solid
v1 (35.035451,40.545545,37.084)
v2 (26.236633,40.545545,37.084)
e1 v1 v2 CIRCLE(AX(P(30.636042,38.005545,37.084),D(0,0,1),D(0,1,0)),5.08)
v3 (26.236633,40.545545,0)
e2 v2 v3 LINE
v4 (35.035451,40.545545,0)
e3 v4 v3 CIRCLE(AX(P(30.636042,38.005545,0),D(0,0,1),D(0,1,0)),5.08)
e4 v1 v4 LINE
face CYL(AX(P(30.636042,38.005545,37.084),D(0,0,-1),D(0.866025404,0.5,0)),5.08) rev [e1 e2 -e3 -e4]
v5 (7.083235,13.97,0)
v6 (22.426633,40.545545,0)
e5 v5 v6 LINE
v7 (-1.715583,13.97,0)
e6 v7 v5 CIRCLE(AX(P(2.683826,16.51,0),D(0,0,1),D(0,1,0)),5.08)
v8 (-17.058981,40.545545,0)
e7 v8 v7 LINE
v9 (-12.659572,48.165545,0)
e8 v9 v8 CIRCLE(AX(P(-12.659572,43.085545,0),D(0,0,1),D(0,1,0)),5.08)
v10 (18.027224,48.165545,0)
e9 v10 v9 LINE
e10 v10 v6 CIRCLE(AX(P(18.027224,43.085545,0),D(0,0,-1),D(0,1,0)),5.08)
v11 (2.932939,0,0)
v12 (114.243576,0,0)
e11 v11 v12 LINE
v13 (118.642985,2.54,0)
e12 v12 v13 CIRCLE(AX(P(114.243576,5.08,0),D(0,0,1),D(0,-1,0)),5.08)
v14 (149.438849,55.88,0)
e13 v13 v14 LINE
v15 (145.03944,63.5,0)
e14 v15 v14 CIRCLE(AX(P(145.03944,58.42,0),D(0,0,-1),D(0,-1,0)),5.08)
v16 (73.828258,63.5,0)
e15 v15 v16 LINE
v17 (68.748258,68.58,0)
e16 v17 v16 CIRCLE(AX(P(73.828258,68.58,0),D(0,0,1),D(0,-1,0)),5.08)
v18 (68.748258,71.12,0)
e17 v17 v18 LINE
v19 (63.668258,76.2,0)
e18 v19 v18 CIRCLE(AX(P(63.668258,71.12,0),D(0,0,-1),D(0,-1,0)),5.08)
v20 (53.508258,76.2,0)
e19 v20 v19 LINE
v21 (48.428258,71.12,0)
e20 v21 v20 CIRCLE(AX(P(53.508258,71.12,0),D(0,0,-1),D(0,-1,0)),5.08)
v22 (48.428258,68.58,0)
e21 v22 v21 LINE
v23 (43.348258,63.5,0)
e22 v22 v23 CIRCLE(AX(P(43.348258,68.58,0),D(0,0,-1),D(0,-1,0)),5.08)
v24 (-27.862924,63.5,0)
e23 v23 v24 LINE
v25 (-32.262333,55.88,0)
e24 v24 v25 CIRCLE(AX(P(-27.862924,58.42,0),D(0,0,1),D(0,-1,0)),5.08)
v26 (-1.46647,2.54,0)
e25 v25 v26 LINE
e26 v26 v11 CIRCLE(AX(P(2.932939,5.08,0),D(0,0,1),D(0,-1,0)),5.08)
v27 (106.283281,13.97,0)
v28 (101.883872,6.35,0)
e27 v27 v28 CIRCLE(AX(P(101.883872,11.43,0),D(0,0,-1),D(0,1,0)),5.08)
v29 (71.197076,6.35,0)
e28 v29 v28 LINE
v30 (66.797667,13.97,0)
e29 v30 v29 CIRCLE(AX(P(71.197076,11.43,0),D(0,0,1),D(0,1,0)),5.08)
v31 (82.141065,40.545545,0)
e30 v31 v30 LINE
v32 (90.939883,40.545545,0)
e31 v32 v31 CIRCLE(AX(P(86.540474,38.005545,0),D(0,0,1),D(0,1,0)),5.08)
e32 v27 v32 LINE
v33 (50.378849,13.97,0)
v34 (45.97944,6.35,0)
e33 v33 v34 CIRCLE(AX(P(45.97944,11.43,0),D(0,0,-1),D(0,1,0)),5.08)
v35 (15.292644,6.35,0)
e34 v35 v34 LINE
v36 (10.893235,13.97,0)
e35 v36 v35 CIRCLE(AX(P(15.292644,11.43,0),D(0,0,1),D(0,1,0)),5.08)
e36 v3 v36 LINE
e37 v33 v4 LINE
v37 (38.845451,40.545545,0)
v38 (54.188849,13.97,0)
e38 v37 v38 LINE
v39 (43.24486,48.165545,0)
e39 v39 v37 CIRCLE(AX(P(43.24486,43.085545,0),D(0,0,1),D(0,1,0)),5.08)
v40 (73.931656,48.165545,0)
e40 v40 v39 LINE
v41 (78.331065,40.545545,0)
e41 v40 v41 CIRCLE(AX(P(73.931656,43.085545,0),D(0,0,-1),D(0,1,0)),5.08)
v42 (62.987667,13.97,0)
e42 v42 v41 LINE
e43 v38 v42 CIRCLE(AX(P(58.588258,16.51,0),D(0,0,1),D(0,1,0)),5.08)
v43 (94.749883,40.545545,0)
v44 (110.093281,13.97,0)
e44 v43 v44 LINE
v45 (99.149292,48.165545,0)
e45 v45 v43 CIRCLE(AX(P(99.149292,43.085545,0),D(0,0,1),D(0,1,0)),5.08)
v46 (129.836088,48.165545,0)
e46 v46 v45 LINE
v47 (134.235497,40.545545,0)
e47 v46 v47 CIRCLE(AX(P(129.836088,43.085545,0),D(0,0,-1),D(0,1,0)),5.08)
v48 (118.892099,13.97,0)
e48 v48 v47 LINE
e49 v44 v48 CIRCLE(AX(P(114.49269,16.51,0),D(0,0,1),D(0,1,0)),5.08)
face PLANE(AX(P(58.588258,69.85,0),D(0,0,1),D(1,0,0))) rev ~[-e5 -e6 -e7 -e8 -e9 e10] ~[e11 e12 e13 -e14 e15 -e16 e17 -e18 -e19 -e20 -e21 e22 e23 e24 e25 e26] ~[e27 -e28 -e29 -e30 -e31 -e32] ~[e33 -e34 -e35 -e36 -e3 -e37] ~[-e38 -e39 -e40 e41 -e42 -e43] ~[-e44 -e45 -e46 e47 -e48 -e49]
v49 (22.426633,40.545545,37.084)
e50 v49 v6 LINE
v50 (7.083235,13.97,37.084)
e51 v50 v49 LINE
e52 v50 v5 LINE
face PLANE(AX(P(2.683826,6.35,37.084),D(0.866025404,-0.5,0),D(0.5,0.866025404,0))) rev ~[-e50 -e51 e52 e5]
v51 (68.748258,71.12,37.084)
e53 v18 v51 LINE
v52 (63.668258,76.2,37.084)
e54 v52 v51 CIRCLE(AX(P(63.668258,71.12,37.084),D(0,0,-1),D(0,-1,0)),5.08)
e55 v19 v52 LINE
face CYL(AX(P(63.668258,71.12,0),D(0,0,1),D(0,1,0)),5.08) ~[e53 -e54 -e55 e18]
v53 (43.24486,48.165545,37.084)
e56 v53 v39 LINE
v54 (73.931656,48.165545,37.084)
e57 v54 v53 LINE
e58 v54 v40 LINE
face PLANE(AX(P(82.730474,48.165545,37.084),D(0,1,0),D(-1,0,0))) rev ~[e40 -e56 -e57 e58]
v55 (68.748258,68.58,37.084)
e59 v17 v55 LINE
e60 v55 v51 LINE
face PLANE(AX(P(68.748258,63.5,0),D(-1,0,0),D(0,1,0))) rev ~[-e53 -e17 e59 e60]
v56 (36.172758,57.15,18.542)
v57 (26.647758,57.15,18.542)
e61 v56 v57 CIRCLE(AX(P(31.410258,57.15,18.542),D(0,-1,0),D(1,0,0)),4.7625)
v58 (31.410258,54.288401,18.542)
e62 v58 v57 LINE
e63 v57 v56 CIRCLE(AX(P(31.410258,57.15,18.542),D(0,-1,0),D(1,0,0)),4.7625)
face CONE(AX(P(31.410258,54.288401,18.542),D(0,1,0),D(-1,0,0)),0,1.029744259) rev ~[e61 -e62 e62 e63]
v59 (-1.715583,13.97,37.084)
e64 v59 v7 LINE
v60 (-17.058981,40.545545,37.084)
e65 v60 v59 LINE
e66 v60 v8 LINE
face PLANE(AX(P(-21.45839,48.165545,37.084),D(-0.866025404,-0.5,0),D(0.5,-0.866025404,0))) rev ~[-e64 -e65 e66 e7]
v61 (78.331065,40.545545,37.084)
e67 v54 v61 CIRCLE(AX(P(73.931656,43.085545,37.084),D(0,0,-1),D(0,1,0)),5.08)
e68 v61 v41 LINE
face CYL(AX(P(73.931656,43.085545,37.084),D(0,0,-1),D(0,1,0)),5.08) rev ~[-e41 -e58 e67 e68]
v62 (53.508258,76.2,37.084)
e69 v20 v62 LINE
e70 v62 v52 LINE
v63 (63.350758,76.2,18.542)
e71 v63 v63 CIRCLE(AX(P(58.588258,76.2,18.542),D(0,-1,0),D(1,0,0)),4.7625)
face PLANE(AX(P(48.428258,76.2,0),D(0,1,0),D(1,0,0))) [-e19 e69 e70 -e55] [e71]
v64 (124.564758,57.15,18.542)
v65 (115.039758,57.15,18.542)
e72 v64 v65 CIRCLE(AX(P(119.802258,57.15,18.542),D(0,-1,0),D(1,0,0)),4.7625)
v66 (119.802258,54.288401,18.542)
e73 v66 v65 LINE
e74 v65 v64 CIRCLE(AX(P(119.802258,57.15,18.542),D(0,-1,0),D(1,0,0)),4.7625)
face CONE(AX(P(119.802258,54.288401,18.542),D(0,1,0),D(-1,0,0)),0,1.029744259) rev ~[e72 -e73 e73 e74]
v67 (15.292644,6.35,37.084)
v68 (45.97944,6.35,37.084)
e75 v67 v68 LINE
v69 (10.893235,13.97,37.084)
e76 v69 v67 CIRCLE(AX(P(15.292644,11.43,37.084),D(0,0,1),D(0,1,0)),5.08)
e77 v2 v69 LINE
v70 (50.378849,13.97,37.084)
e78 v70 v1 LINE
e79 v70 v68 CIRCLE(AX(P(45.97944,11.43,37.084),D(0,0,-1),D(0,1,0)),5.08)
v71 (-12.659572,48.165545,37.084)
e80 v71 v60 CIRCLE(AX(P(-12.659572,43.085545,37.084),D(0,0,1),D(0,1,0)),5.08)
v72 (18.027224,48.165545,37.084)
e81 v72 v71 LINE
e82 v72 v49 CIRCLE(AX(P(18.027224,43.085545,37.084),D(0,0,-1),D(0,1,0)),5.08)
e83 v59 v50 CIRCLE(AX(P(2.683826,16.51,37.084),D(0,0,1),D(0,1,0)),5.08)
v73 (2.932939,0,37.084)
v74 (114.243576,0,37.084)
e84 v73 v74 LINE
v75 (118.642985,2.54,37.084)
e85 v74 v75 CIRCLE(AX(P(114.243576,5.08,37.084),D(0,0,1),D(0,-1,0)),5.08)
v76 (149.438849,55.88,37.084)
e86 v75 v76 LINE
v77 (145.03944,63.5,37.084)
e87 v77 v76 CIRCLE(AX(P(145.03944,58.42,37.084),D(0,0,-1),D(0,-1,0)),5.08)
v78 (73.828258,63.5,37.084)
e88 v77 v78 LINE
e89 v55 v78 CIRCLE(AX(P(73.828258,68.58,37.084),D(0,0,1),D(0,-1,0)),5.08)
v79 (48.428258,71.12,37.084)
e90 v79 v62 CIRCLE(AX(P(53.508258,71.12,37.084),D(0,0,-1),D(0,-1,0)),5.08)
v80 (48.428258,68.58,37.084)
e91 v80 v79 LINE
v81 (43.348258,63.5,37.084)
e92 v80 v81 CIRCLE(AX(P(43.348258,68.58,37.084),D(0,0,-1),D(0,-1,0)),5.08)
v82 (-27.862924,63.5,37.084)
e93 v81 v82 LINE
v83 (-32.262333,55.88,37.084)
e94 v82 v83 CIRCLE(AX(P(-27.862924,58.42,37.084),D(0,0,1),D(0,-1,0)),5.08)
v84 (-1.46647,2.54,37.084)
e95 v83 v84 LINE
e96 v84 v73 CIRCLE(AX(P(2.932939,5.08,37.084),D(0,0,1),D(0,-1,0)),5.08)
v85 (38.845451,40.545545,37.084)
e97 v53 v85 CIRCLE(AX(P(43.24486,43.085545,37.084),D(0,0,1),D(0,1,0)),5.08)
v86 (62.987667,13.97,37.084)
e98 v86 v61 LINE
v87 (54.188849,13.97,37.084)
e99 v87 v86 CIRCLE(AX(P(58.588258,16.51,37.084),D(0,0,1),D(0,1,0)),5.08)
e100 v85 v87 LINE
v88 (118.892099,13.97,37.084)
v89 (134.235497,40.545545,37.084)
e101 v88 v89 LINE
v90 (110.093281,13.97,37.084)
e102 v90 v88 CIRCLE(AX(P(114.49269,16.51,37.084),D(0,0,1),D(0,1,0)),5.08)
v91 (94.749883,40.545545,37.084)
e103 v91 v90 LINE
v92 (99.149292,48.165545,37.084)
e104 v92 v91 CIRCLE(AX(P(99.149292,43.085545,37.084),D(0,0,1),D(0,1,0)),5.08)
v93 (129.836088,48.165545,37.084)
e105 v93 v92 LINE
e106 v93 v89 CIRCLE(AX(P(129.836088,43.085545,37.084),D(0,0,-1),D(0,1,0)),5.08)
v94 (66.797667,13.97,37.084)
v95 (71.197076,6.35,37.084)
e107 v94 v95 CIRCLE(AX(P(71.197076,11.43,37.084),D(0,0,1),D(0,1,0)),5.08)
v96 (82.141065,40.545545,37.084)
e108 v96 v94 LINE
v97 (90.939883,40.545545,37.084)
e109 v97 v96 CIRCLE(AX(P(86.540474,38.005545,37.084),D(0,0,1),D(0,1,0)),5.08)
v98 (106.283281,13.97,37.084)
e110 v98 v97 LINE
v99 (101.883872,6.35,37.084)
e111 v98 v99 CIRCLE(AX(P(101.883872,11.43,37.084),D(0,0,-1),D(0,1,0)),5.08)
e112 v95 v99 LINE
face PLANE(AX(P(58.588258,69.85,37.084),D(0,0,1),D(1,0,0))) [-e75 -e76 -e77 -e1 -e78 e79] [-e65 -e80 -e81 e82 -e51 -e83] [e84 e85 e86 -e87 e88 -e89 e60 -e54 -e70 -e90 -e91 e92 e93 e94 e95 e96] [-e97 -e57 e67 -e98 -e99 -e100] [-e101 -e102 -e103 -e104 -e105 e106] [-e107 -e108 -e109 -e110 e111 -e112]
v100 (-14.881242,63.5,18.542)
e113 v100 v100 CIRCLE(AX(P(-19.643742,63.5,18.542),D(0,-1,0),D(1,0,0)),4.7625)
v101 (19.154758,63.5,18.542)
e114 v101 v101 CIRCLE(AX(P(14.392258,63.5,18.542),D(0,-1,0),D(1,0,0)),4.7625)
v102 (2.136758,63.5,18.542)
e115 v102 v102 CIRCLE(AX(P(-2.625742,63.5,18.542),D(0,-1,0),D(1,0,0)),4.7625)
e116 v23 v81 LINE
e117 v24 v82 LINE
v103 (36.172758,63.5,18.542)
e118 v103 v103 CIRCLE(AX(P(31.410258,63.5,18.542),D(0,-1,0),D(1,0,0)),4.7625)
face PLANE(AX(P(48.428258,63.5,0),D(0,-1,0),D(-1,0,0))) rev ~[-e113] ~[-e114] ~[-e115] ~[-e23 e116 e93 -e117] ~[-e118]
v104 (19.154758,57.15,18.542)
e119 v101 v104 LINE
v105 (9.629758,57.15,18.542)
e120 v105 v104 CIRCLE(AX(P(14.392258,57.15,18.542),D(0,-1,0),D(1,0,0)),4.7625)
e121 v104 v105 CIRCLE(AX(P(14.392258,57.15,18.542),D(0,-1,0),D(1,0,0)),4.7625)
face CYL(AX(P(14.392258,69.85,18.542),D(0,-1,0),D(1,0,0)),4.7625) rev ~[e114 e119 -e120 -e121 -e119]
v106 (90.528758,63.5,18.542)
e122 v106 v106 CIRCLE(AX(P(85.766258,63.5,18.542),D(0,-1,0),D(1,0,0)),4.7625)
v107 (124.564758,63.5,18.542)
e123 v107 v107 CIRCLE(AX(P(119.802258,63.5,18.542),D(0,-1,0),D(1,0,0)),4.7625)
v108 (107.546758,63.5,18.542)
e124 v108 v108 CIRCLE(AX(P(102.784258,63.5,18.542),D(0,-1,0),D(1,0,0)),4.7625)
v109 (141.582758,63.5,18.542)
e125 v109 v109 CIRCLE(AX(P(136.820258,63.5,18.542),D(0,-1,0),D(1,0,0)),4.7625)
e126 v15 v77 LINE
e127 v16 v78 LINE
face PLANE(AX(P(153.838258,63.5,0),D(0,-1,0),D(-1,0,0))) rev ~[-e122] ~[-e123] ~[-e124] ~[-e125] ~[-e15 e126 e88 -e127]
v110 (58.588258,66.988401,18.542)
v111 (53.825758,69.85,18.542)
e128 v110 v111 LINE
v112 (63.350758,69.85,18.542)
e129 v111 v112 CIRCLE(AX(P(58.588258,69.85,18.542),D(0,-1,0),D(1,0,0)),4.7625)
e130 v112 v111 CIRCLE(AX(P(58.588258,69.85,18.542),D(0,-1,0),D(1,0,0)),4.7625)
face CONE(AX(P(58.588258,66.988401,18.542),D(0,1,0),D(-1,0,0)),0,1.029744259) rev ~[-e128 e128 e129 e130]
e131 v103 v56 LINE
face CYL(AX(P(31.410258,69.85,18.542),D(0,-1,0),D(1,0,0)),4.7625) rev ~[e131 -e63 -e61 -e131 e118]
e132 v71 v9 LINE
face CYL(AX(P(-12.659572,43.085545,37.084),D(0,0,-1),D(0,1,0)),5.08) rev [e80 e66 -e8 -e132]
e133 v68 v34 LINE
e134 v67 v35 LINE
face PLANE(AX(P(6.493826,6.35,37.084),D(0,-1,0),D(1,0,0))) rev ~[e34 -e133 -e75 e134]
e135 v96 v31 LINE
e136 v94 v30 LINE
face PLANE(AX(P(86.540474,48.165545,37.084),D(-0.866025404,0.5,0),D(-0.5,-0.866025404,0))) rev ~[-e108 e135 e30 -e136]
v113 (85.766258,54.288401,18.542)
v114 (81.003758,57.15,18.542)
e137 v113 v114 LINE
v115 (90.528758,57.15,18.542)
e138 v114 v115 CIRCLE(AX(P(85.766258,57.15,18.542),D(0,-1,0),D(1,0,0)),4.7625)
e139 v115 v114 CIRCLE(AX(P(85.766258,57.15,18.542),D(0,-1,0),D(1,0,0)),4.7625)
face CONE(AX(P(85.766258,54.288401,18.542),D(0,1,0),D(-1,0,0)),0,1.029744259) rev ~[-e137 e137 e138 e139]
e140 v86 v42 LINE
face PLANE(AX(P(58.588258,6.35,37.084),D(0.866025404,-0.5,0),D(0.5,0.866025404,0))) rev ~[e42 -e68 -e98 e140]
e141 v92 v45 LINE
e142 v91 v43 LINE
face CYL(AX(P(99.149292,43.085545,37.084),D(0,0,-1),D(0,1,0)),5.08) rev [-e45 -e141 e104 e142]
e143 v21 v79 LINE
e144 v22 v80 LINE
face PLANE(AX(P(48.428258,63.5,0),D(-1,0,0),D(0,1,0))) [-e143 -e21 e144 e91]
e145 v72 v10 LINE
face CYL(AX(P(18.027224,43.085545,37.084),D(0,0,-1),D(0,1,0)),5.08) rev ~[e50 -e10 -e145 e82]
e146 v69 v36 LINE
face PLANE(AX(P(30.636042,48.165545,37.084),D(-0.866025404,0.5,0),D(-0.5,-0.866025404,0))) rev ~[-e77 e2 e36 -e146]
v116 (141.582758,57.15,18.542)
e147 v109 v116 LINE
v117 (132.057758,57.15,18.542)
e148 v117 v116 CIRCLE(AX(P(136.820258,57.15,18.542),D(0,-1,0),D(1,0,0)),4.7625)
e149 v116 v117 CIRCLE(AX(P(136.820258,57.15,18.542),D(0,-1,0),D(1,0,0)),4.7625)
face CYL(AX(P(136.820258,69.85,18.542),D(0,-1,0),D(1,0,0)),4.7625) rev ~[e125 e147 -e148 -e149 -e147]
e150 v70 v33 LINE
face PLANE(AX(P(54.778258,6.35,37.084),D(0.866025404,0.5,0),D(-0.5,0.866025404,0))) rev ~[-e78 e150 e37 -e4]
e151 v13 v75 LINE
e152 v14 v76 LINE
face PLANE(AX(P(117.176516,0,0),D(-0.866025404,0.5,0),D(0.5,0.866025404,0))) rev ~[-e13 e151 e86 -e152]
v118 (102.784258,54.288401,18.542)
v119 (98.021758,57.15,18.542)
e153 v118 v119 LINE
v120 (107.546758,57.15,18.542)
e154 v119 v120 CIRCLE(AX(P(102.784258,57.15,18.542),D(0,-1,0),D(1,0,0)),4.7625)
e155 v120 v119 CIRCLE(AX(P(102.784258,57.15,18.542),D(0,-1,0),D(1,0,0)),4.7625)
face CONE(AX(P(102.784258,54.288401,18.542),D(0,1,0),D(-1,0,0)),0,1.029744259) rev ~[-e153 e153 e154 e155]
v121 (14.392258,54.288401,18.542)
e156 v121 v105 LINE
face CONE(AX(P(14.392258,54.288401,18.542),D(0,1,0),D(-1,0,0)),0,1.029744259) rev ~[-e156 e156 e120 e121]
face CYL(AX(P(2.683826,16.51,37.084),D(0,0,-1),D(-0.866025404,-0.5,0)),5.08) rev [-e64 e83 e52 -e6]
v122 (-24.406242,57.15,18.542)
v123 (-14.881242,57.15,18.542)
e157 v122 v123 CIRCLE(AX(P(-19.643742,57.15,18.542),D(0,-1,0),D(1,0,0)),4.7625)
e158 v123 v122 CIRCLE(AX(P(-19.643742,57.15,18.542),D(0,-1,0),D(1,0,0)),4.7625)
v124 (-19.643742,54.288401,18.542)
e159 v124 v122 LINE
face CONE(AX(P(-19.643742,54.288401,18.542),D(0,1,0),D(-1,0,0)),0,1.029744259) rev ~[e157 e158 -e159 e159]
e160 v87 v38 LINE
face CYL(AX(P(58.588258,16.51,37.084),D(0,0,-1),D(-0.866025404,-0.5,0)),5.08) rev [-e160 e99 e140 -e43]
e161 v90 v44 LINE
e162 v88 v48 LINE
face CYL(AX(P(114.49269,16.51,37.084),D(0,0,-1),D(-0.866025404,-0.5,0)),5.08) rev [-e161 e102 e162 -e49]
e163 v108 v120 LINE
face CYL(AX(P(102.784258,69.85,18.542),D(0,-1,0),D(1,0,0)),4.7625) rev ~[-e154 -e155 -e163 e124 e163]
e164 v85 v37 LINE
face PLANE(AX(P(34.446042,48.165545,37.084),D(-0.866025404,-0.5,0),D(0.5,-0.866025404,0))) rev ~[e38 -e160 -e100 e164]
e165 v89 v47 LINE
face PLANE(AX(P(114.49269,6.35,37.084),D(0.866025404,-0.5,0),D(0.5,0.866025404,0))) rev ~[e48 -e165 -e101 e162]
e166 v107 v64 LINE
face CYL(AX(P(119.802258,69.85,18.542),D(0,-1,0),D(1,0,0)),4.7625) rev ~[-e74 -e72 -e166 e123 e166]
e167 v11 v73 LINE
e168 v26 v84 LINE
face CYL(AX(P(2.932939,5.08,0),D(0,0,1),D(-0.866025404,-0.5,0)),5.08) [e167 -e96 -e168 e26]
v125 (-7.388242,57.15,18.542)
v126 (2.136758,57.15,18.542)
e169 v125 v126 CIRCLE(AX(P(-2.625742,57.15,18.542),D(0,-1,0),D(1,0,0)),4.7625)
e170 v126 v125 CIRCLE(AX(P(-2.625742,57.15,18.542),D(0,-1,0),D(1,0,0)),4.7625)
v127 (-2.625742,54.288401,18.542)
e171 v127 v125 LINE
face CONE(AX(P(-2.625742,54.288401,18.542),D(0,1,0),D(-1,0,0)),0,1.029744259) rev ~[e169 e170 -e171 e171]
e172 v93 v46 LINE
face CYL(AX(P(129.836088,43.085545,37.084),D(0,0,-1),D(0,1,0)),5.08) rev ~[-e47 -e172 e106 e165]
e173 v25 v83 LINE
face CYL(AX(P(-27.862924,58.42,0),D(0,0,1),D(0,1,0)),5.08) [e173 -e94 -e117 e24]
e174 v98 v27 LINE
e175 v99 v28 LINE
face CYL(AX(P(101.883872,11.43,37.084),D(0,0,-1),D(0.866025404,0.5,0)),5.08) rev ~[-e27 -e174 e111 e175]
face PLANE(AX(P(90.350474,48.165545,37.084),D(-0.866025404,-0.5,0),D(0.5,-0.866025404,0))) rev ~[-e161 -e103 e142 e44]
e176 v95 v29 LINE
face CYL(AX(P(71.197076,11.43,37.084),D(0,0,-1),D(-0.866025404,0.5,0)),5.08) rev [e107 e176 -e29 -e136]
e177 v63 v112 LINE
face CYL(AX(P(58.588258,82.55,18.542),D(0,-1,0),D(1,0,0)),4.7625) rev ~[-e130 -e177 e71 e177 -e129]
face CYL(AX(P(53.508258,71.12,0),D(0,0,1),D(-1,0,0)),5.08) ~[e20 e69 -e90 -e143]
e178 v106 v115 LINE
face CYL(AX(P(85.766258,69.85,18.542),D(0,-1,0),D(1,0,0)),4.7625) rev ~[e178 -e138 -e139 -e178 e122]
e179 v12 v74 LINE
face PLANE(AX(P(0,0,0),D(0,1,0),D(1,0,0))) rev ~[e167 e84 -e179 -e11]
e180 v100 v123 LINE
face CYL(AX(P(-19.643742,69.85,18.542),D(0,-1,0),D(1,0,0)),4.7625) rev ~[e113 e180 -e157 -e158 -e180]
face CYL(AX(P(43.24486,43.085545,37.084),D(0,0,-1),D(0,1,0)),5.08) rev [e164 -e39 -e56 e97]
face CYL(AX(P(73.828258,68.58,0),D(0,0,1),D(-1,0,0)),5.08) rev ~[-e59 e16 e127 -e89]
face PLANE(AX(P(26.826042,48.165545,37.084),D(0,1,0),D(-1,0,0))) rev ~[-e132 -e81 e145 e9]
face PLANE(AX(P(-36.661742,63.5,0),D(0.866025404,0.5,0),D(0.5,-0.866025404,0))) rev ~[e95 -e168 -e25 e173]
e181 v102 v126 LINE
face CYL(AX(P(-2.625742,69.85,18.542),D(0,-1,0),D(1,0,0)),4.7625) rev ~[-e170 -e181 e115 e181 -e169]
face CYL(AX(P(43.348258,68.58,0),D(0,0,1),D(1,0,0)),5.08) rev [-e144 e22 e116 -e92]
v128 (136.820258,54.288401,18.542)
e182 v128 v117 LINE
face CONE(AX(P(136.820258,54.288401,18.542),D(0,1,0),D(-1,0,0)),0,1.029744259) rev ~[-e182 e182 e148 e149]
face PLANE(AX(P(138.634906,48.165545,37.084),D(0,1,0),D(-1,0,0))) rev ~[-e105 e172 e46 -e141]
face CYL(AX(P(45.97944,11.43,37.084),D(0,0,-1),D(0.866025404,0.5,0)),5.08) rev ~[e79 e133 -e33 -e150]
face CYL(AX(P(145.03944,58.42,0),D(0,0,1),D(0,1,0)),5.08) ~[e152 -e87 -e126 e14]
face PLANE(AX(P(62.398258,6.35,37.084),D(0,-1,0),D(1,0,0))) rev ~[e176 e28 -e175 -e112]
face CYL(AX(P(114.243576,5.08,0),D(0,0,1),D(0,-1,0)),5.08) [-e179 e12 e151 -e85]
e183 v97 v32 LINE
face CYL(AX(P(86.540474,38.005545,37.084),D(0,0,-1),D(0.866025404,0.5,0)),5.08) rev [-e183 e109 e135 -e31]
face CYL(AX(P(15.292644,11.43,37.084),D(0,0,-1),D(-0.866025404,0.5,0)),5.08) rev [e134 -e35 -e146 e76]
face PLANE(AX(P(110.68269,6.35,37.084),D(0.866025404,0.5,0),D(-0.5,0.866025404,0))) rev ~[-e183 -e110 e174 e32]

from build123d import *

# Parameters (mm, degrees)
F0_W           = 20.32
F0_H           = 12.7
F1_DEPTH       = 37.084
F5_D           = 9.525
F5_DEPTH       = 6.35
F5_TIP         = 2.8615986981
F5_ON_F3_D     = 9.525
F5_ON_F3_DEPTH = 6.35
F5_ON_F3_TIP   = 2.8615986981
F5_ON_F4_D     = 9.525
F5_ON_F4_DEPTH = 6.35
F5_ON_F4_TIP   = 2.8615986981
F7_DEPTH       = 37.085
F8_R           = 5.08


# Not quite as in the source:
# - a length typed as a fraction of an inch, garbled in the dataset ("3 / 203.2 mm" for 3/8 in), is restored


with BuildPart() as f1:
    # F0 (on Top) → F1 (new body)
    with BuildSketch(Plane.XY):
        with Locations((58.5882579065, 69.85)):
            Rectangle(F0_W, F0_H)
        Polygon((48.4282579065, 63.5), (-36.6617420935, 63.5), (0, 0), (117.1765158129, 0), (153.8382579065, 63.5), (68.7482579065, 63.5), align=None)
    extrude(amount=F1_DEPTH)

    # F5
    with Locations(Plane(origin=(0, 63.5, 0), x_dir=(-1, 0, 0), z_dir=(0, 1, 0))):
        with Locations((-136.8202579065, 18.542), (-119.8022579065, 18.542), (-102.7842579065, 18.542), (-85.7662579065, 18.542)):
            Hole(F5_D / 2, depth=F5_DEPTH)
            with Locations((0, 0, -(F5_DEPTH + F5_TIP / 2))):  # 118° drill point
                Cone(0, F5_D / 2, F5_TIP, mode=Mode.SUBTRACT)

    # F5 on F3
    with Locations(Plane(origin=(0, 63.5, 0), x_dir=(-1, 0, 0), z_dir=(0, 1, 0))):
        with Locations((-31.4102579065, 18.542), (-14.3922579065, 18.542), (2.6257420935, 18.542), (19.6437420935, 18.542)):
            Hole(F5_ON_F3_D / 2, depth=F5_ON_F3_DEPTH)
            with Locations((0, 0, -(F5_ON_F3_DEPTH + F5_ON_F3_TIP / 2))):  # 118° drill point
                Cone(0, F5_ON_F3_D / 2, F5_ON_F3_TIP, mode=Mode.SUBTRACT)

    # F5 on F4
    with Locations(Plane(origin=(0, 76.2, 0), x_dir=(-1, 0, 0), z_dir=(0, 1, 0))):
        with Locations((-58.5882579065, 18.542)):
            Hole(F5_ON_F4_D / 2, depth=F5_ON_F4_DEPTH)
            with Locations((0, 0, -(F5_ON_F4_DEPTH + F5_ON_F4_TIP / 2))):  # 118° drill point
                Cone(0, F5_ON_F4_D / 2, F5_ON_F4_TIP, mode=Mode.SUBTRACT)

    # F6 (on face) → F7 (cut, through all)
    with BuildSketch(Plane.XY.offset(37.084)):
        Polygon((26.8260418486, 48.1655448196), (-21.4583902673, 48.1655448196), (2.6838257906, 6.35), align=None)
        Polygon((54.7782579065, 6.35), (30.6360418486, 48.1655448196), (6.4938257906, 6.35), align=None)
        Polygon((82.7304739644, 48.1655448196), (34.4460418486, 48.1655448196), (58.5882579065, 6.35), align=None)
        Polygon((110.6826900223, 6.35), (86.5404739644, 48.1655448196), (62.3982579065, 6.35), align=None)
        Polygon((138.6349060802, 48.1655448196), (90.3504739644, 48.1655448196), (114.4926900223, 6.35), align=None)
    extrude(amount=-F7_DEPTH, mode=Mode.SUBTRACT)

    # F8
    f8_edges = [f1.edges().sort_by_distance(p)[0] for p in [
        (48.428258, 63.5, 18.542),
        (68.748258, 63.5, 18.542),
        (48.428258, 76.2, 18.542),
        (68.748258, 76.2, 18.542),
        (153.838258, 63.5, 18.542),
        (-36.661742, 63.5, 18.542),
        (-21.45839, 48.165545, 18.542),
        (0, 0, 18.542),
        (26.826042, 48.165545, 18.542),
        (82.730474, 48.165545, 18.542),
        (138.634906, 48.165545, 18.542),
        (110.68269, 6.35, 18.542),
        (114.49269, 6.35, 18.542),
        (2.683826, 6.35, 18.542),
        (117.176516, 0, 18.542),
        (90.350474, 48.165545, 18.542),
        (34.446042, 48.165545, 18.542),
        (30.636042, 48.165545, 18.542),
        (86.540474, 48.165545, 18.542),
        (62.398258, 6.35, 18.542),
        (6.493826, 6.35, 18.542),
        (58.588258, 6.35, 18.542),
        (54.778258, 6.35, 18.542),
    ]]
    fillet(f8_edges, radius=F8_R)


solid = f1.part
